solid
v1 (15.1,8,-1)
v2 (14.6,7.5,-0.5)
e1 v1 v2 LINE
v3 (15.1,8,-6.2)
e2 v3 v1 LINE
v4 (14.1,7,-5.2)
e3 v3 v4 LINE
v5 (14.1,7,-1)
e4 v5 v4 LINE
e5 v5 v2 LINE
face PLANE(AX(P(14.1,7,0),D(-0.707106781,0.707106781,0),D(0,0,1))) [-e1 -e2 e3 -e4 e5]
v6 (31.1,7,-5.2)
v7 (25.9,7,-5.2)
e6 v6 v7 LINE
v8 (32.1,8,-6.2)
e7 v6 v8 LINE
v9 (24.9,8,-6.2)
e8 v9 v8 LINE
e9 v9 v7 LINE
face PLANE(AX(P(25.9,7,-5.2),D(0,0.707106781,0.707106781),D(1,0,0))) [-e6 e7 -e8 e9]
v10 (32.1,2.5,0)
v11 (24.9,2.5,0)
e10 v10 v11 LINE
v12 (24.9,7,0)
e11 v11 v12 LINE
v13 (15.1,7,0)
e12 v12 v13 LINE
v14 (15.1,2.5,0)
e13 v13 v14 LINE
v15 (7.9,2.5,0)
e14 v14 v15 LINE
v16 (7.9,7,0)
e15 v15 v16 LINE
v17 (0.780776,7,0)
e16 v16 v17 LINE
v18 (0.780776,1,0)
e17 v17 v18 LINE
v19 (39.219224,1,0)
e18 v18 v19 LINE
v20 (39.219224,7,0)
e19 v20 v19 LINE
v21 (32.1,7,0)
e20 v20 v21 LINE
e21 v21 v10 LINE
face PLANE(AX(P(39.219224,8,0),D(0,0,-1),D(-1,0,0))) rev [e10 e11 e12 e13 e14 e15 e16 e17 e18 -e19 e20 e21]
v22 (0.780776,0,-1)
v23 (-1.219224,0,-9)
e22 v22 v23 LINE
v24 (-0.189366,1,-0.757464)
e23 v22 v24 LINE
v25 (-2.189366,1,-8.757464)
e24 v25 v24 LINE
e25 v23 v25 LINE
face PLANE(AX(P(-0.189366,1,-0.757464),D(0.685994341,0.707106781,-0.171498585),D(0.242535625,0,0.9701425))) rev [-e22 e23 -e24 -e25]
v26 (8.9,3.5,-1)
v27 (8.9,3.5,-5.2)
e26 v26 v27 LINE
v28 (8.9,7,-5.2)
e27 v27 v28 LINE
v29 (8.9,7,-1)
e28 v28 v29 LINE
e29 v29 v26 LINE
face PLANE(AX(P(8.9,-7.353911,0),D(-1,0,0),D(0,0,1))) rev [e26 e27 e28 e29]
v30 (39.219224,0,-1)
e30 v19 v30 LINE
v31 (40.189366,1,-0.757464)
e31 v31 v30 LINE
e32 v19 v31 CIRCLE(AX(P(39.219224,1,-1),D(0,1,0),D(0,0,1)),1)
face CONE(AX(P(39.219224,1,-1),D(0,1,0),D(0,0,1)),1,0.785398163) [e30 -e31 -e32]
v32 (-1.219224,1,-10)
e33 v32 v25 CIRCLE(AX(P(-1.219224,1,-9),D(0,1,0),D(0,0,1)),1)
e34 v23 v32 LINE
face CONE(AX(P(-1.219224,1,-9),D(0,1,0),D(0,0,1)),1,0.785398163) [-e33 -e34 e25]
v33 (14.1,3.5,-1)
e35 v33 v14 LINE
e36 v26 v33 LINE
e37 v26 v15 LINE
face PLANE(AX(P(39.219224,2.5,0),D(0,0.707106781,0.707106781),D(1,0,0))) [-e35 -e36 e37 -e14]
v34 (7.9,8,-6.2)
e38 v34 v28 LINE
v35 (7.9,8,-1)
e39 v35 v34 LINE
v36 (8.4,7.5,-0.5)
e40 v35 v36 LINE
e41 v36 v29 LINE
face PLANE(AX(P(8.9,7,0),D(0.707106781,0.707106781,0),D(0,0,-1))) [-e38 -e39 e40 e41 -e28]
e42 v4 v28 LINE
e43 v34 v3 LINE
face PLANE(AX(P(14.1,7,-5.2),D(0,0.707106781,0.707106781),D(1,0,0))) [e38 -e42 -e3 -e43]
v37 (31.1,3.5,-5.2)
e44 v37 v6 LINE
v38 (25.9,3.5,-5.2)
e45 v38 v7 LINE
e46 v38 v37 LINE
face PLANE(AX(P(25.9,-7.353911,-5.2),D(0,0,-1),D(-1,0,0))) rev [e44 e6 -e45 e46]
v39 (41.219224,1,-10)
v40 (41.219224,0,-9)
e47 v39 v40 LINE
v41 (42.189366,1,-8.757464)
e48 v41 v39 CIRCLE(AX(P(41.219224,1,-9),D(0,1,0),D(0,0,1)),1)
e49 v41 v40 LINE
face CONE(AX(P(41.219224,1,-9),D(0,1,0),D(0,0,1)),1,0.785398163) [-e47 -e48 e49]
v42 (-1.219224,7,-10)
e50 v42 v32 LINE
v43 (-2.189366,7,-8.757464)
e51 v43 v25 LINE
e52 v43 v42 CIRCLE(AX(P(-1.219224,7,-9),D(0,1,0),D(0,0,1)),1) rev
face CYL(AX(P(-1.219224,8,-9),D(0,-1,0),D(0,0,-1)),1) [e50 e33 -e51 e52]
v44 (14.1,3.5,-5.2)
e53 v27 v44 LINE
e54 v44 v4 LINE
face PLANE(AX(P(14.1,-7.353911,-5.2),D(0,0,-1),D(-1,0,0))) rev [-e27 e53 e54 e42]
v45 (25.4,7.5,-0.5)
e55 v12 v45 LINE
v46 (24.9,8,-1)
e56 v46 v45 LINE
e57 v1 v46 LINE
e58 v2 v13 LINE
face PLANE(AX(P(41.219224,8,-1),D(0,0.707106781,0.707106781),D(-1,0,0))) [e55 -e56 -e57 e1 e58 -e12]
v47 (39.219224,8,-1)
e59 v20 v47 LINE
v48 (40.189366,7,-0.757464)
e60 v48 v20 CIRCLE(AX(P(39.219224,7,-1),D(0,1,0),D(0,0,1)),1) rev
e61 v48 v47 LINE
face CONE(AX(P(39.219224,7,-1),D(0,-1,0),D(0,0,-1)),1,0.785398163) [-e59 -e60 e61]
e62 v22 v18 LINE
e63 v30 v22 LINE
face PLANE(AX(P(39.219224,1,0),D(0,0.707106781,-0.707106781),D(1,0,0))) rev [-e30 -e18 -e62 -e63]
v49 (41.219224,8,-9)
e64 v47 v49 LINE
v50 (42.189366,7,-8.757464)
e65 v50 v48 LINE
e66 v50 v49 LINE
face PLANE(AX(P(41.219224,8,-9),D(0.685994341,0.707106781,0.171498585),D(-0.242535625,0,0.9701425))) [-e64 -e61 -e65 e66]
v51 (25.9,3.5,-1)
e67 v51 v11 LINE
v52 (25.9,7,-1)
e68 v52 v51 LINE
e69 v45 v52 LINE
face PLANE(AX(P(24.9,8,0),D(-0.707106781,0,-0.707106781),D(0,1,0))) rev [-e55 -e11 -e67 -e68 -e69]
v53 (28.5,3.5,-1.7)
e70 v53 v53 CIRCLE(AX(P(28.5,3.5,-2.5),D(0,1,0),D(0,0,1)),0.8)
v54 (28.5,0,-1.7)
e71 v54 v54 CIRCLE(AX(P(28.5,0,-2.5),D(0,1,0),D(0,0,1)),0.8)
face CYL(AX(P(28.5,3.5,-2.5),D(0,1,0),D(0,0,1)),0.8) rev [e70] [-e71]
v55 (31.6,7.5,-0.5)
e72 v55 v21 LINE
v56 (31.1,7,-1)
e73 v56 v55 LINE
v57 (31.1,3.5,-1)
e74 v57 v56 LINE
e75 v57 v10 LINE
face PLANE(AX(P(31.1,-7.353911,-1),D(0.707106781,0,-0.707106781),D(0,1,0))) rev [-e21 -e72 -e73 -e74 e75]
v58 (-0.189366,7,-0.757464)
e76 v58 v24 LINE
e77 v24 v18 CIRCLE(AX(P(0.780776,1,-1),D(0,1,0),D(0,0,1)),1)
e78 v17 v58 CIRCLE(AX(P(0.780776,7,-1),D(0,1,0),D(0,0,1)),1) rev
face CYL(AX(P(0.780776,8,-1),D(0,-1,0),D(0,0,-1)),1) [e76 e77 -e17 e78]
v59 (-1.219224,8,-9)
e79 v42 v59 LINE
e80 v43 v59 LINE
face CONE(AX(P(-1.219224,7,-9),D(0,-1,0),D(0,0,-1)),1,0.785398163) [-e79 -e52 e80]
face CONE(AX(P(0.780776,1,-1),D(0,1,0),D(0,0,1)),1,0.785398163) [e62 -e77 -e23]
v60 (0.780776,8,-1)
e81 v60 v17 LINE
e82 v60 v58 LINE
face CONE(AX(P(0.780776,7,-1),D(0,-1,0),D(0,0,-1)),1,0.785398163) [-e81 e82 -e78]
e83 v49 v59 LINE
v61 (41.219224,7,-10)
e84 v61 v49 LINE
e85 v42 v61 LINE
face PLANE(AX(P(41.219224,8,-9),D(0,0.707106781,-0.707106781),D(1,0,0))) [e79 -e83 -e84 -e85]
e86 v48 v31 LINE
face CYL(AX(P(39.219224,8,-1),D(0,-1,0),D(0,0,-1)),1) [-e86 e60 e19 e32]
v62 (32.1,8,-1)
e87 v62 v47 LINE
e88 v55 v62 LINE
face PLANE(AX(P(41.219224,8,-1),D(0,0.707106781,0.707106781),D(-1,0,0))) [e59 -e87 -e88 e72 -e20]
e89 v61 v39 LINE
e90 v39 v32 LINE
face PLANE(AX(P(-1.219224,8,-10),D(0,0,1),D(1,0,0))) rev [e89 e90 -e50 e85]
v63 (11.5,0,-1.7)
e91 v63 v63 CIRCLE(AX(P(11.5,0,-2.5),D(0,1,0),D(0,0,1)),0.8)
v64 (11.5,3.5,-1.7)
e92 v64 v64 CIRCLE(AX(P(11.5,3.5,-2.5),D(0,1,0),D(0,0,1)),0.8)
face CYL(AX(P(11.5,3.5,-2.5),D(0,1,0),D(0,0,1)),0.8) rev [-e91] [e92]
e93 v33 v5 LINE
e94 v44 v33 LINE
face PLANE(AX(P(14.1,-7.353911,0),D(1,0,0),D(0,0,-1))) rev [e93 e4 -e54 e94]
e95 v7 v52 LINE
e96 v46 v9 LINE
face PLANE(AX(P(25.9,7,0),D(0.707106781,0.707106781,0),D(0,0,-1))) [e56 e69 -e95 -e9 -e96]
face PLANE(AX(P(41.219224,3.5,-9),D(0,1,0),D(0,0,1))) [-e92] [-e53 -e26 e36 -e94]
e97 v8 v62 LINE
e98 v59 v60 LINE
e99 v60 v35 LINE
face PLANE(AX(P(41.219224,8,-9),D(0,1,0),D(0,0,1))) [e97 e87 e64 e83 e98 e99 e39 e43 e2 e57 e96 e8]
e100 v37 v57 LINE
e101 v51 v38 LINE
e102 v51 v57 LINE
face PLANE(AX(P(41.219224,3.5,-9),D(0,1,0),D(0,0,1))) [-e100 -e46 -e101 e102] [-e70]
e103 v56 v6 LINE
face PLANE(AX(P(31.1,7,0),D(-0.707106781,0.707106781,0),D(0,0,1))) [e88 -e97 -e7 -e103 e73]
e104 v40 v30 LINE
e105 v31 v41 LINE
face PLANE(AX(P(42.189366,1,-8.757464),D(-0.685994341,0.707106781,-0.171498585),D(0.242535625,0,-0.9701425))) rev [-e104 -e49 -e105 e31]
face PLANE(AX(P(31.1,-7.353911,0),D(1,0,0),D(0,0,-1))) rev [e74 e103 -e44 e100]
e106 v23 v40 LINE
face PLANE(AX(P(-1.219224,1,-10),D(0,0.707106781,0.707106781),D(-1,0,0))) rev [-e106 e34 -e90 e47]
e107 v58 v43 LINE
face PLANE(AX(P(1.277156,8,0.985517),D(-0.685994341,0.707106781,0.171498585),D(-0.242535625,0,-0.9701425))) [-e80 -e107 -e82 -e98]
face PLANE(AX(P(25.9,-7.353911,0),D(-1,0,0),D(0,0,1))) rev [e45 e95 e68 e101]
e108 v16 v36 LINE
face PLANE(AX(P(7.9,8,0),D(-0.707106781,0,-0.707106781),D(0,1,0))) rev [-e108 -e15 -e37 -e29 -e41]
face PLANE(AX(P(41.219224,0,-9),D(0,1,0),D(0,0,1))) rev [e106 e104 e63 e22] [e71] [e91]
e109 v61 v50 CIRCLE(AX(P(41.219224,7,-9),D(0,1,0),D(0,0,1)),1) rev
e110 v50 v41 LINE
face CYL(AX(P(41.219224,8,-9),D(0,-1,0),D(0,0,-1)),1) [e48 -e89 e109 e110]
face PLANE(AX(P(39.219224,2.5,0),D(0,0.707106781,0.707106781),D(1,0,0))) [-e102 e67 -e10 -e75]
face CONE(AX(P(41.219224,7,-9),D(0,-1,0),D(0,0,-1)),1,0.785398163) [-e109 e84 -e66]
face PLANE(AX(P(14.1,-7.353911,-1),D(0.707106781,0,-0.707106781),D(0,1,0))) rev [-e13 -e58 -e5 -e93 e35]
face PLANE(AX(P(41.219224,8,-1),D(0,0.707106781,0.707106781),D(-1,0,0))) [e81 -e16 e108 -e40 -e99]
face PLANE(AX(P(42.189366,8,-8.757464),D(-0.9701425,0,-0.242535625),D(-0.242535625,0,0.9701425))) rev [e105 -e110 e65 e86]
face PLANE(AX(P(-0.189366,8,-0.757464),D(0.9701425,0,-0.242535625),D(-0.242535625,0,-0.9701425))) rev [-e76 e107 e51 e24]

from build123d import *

# Parameters (mm, degrees)
RESSALTO_EXTRUS_O2_DEPTH = 8
ESBO_O4_W                = 5.2
ESBO_O4_H                = 5.2
CORTE_EXTRUS_O1_DEPTH    = 4.5
CHANFRO1_SIZE            = 1
CHANFRO2_SIZE            = 1
FURO_ROSCADO_DE_M21_D    = 1.6


with BuildPart() as part:
    # Esboço2 → Ressalto-extrusão2 (new body)
    with BuildSketch(Plane(origin=(0, 0, 0), x_dir=(1, 0, 0), z_dir=(0, 1, 0))):
        with BuildLine():
            Line((-0.189366094, 0.757464375), (-2.189366094, 8.757464375))
            ThreePointArc((-2.189366094, 8.757464375), (-2.007429032, 9.615412209), (-1.219223594, 10))
            Line((-1.219223594, 10), (41.219223594, 10))
            ThreePointArc((41.219223594, 10), (42.007429032, 9.615412209), (42.189366094, 8.757464375))
            Line((42.189366094, 8.757464375), (40.189366094, 0.757464375))
            ThreePointArc((40.189366094, 0.757464375), (39.834635803, 0.211794562), (39.219223594, 0))
            Line((39.219223594, 0), (0.780776406, 0))
            ThreePointArc((0.780776406, 0), (0.165364197, 0.211794562), (-0.189366094, 0.757464375))
        make_face()
    extrude(amount=RESSALTO_EXTRUS_O2_DEPTH)

    # Esboço4 → Corte-extrusão1 (cut)
    with BuildSketch(Plane(origin=(0, 8, 0), x_dir=(1, 0, 0), z_dir=(0, 1, 0))):
        with Locations((28.5, 2.6)):
            Rectangle(ESBO_O4_W, ESBO_O4_H)
        with Locations((11.5, 2.6)):
            Rectangle(ESBO_O4_W, ESBO_O4_H)
    extrude(amount=-CORTE_EXTRUS_O1_DEPTH, mode=Mode.SUBTRACT)

    # Chanfro1
    chanfro1_edges = [part.edges().sort_by_distance(p)[0] for p in [
        (-2.007429032, 8, -9.615412209),
        (-1.189366094, 8, -4.757464375),
        (0.165364197, 8, -0.211794562),
        (4.840388203, 8, 0),
        (20, 8, 0),
        (35.159611797, 8, 0),
        (39.834635803, 8, -0.211794562),
        (41.189366094, 8, -4.757464375),
        (31.1, 8, -2.6),
        (28.5, 8, -5.2),
        (25.9, 8, -2.6),
        (8.9, 8, -2.6),
        (14.1, 8, -2.6),
        (11.5, 8, -5.2),
        (42.007429032, 8, -9.615412209),
        (20, 8, -10),
    ]]
    chamfer(chanfro1_edges, length=CHANFRO1_SIZE - 0.0001)  # a hair under: the kernel refuses the full size

    # Chanfro2
    chanfro2_edges = [part.edges().sort_by_distance(p)[0] for p in [
        (-1.189366094, 0, -4.757464375),
        (-2.007429032, 0, -9.615412209),
        (20, 0, -10),
        (42.007429032, 0, -9.615412209),
        (31.1, 5.25005, 0),
        (25.9, 5.25005, 0),
        (28.5, 3.5, 0),
        (8.9, 5.25005, 0),
        (14.1, 5.25005, 0),
        (11.5, 3.5, 0),
        (41.189366094, 0, -4.757464375),
        (39.834635803, 0, -0.211794562),
        (20, 0, 0),
        (0.165364197, 0, -0.211794562),
    ]]
    chamfer(chanfro2_edges, length=CHANFRO2_SIZE - 0.0001)  # a hair under: the kernel refuses the full size

    # Furo roscado de M21 (through all)
    with Locations(Plane(origin=(28.5, 3.5, -2.5), x_dir=(0, 0, 1), z_dir=(0, 1, 0))):
        with Locations((0, 0), (0, -17)):
            Hole(FURO_ROSCADO_DE_M21_D / 2)


solid = part.part
